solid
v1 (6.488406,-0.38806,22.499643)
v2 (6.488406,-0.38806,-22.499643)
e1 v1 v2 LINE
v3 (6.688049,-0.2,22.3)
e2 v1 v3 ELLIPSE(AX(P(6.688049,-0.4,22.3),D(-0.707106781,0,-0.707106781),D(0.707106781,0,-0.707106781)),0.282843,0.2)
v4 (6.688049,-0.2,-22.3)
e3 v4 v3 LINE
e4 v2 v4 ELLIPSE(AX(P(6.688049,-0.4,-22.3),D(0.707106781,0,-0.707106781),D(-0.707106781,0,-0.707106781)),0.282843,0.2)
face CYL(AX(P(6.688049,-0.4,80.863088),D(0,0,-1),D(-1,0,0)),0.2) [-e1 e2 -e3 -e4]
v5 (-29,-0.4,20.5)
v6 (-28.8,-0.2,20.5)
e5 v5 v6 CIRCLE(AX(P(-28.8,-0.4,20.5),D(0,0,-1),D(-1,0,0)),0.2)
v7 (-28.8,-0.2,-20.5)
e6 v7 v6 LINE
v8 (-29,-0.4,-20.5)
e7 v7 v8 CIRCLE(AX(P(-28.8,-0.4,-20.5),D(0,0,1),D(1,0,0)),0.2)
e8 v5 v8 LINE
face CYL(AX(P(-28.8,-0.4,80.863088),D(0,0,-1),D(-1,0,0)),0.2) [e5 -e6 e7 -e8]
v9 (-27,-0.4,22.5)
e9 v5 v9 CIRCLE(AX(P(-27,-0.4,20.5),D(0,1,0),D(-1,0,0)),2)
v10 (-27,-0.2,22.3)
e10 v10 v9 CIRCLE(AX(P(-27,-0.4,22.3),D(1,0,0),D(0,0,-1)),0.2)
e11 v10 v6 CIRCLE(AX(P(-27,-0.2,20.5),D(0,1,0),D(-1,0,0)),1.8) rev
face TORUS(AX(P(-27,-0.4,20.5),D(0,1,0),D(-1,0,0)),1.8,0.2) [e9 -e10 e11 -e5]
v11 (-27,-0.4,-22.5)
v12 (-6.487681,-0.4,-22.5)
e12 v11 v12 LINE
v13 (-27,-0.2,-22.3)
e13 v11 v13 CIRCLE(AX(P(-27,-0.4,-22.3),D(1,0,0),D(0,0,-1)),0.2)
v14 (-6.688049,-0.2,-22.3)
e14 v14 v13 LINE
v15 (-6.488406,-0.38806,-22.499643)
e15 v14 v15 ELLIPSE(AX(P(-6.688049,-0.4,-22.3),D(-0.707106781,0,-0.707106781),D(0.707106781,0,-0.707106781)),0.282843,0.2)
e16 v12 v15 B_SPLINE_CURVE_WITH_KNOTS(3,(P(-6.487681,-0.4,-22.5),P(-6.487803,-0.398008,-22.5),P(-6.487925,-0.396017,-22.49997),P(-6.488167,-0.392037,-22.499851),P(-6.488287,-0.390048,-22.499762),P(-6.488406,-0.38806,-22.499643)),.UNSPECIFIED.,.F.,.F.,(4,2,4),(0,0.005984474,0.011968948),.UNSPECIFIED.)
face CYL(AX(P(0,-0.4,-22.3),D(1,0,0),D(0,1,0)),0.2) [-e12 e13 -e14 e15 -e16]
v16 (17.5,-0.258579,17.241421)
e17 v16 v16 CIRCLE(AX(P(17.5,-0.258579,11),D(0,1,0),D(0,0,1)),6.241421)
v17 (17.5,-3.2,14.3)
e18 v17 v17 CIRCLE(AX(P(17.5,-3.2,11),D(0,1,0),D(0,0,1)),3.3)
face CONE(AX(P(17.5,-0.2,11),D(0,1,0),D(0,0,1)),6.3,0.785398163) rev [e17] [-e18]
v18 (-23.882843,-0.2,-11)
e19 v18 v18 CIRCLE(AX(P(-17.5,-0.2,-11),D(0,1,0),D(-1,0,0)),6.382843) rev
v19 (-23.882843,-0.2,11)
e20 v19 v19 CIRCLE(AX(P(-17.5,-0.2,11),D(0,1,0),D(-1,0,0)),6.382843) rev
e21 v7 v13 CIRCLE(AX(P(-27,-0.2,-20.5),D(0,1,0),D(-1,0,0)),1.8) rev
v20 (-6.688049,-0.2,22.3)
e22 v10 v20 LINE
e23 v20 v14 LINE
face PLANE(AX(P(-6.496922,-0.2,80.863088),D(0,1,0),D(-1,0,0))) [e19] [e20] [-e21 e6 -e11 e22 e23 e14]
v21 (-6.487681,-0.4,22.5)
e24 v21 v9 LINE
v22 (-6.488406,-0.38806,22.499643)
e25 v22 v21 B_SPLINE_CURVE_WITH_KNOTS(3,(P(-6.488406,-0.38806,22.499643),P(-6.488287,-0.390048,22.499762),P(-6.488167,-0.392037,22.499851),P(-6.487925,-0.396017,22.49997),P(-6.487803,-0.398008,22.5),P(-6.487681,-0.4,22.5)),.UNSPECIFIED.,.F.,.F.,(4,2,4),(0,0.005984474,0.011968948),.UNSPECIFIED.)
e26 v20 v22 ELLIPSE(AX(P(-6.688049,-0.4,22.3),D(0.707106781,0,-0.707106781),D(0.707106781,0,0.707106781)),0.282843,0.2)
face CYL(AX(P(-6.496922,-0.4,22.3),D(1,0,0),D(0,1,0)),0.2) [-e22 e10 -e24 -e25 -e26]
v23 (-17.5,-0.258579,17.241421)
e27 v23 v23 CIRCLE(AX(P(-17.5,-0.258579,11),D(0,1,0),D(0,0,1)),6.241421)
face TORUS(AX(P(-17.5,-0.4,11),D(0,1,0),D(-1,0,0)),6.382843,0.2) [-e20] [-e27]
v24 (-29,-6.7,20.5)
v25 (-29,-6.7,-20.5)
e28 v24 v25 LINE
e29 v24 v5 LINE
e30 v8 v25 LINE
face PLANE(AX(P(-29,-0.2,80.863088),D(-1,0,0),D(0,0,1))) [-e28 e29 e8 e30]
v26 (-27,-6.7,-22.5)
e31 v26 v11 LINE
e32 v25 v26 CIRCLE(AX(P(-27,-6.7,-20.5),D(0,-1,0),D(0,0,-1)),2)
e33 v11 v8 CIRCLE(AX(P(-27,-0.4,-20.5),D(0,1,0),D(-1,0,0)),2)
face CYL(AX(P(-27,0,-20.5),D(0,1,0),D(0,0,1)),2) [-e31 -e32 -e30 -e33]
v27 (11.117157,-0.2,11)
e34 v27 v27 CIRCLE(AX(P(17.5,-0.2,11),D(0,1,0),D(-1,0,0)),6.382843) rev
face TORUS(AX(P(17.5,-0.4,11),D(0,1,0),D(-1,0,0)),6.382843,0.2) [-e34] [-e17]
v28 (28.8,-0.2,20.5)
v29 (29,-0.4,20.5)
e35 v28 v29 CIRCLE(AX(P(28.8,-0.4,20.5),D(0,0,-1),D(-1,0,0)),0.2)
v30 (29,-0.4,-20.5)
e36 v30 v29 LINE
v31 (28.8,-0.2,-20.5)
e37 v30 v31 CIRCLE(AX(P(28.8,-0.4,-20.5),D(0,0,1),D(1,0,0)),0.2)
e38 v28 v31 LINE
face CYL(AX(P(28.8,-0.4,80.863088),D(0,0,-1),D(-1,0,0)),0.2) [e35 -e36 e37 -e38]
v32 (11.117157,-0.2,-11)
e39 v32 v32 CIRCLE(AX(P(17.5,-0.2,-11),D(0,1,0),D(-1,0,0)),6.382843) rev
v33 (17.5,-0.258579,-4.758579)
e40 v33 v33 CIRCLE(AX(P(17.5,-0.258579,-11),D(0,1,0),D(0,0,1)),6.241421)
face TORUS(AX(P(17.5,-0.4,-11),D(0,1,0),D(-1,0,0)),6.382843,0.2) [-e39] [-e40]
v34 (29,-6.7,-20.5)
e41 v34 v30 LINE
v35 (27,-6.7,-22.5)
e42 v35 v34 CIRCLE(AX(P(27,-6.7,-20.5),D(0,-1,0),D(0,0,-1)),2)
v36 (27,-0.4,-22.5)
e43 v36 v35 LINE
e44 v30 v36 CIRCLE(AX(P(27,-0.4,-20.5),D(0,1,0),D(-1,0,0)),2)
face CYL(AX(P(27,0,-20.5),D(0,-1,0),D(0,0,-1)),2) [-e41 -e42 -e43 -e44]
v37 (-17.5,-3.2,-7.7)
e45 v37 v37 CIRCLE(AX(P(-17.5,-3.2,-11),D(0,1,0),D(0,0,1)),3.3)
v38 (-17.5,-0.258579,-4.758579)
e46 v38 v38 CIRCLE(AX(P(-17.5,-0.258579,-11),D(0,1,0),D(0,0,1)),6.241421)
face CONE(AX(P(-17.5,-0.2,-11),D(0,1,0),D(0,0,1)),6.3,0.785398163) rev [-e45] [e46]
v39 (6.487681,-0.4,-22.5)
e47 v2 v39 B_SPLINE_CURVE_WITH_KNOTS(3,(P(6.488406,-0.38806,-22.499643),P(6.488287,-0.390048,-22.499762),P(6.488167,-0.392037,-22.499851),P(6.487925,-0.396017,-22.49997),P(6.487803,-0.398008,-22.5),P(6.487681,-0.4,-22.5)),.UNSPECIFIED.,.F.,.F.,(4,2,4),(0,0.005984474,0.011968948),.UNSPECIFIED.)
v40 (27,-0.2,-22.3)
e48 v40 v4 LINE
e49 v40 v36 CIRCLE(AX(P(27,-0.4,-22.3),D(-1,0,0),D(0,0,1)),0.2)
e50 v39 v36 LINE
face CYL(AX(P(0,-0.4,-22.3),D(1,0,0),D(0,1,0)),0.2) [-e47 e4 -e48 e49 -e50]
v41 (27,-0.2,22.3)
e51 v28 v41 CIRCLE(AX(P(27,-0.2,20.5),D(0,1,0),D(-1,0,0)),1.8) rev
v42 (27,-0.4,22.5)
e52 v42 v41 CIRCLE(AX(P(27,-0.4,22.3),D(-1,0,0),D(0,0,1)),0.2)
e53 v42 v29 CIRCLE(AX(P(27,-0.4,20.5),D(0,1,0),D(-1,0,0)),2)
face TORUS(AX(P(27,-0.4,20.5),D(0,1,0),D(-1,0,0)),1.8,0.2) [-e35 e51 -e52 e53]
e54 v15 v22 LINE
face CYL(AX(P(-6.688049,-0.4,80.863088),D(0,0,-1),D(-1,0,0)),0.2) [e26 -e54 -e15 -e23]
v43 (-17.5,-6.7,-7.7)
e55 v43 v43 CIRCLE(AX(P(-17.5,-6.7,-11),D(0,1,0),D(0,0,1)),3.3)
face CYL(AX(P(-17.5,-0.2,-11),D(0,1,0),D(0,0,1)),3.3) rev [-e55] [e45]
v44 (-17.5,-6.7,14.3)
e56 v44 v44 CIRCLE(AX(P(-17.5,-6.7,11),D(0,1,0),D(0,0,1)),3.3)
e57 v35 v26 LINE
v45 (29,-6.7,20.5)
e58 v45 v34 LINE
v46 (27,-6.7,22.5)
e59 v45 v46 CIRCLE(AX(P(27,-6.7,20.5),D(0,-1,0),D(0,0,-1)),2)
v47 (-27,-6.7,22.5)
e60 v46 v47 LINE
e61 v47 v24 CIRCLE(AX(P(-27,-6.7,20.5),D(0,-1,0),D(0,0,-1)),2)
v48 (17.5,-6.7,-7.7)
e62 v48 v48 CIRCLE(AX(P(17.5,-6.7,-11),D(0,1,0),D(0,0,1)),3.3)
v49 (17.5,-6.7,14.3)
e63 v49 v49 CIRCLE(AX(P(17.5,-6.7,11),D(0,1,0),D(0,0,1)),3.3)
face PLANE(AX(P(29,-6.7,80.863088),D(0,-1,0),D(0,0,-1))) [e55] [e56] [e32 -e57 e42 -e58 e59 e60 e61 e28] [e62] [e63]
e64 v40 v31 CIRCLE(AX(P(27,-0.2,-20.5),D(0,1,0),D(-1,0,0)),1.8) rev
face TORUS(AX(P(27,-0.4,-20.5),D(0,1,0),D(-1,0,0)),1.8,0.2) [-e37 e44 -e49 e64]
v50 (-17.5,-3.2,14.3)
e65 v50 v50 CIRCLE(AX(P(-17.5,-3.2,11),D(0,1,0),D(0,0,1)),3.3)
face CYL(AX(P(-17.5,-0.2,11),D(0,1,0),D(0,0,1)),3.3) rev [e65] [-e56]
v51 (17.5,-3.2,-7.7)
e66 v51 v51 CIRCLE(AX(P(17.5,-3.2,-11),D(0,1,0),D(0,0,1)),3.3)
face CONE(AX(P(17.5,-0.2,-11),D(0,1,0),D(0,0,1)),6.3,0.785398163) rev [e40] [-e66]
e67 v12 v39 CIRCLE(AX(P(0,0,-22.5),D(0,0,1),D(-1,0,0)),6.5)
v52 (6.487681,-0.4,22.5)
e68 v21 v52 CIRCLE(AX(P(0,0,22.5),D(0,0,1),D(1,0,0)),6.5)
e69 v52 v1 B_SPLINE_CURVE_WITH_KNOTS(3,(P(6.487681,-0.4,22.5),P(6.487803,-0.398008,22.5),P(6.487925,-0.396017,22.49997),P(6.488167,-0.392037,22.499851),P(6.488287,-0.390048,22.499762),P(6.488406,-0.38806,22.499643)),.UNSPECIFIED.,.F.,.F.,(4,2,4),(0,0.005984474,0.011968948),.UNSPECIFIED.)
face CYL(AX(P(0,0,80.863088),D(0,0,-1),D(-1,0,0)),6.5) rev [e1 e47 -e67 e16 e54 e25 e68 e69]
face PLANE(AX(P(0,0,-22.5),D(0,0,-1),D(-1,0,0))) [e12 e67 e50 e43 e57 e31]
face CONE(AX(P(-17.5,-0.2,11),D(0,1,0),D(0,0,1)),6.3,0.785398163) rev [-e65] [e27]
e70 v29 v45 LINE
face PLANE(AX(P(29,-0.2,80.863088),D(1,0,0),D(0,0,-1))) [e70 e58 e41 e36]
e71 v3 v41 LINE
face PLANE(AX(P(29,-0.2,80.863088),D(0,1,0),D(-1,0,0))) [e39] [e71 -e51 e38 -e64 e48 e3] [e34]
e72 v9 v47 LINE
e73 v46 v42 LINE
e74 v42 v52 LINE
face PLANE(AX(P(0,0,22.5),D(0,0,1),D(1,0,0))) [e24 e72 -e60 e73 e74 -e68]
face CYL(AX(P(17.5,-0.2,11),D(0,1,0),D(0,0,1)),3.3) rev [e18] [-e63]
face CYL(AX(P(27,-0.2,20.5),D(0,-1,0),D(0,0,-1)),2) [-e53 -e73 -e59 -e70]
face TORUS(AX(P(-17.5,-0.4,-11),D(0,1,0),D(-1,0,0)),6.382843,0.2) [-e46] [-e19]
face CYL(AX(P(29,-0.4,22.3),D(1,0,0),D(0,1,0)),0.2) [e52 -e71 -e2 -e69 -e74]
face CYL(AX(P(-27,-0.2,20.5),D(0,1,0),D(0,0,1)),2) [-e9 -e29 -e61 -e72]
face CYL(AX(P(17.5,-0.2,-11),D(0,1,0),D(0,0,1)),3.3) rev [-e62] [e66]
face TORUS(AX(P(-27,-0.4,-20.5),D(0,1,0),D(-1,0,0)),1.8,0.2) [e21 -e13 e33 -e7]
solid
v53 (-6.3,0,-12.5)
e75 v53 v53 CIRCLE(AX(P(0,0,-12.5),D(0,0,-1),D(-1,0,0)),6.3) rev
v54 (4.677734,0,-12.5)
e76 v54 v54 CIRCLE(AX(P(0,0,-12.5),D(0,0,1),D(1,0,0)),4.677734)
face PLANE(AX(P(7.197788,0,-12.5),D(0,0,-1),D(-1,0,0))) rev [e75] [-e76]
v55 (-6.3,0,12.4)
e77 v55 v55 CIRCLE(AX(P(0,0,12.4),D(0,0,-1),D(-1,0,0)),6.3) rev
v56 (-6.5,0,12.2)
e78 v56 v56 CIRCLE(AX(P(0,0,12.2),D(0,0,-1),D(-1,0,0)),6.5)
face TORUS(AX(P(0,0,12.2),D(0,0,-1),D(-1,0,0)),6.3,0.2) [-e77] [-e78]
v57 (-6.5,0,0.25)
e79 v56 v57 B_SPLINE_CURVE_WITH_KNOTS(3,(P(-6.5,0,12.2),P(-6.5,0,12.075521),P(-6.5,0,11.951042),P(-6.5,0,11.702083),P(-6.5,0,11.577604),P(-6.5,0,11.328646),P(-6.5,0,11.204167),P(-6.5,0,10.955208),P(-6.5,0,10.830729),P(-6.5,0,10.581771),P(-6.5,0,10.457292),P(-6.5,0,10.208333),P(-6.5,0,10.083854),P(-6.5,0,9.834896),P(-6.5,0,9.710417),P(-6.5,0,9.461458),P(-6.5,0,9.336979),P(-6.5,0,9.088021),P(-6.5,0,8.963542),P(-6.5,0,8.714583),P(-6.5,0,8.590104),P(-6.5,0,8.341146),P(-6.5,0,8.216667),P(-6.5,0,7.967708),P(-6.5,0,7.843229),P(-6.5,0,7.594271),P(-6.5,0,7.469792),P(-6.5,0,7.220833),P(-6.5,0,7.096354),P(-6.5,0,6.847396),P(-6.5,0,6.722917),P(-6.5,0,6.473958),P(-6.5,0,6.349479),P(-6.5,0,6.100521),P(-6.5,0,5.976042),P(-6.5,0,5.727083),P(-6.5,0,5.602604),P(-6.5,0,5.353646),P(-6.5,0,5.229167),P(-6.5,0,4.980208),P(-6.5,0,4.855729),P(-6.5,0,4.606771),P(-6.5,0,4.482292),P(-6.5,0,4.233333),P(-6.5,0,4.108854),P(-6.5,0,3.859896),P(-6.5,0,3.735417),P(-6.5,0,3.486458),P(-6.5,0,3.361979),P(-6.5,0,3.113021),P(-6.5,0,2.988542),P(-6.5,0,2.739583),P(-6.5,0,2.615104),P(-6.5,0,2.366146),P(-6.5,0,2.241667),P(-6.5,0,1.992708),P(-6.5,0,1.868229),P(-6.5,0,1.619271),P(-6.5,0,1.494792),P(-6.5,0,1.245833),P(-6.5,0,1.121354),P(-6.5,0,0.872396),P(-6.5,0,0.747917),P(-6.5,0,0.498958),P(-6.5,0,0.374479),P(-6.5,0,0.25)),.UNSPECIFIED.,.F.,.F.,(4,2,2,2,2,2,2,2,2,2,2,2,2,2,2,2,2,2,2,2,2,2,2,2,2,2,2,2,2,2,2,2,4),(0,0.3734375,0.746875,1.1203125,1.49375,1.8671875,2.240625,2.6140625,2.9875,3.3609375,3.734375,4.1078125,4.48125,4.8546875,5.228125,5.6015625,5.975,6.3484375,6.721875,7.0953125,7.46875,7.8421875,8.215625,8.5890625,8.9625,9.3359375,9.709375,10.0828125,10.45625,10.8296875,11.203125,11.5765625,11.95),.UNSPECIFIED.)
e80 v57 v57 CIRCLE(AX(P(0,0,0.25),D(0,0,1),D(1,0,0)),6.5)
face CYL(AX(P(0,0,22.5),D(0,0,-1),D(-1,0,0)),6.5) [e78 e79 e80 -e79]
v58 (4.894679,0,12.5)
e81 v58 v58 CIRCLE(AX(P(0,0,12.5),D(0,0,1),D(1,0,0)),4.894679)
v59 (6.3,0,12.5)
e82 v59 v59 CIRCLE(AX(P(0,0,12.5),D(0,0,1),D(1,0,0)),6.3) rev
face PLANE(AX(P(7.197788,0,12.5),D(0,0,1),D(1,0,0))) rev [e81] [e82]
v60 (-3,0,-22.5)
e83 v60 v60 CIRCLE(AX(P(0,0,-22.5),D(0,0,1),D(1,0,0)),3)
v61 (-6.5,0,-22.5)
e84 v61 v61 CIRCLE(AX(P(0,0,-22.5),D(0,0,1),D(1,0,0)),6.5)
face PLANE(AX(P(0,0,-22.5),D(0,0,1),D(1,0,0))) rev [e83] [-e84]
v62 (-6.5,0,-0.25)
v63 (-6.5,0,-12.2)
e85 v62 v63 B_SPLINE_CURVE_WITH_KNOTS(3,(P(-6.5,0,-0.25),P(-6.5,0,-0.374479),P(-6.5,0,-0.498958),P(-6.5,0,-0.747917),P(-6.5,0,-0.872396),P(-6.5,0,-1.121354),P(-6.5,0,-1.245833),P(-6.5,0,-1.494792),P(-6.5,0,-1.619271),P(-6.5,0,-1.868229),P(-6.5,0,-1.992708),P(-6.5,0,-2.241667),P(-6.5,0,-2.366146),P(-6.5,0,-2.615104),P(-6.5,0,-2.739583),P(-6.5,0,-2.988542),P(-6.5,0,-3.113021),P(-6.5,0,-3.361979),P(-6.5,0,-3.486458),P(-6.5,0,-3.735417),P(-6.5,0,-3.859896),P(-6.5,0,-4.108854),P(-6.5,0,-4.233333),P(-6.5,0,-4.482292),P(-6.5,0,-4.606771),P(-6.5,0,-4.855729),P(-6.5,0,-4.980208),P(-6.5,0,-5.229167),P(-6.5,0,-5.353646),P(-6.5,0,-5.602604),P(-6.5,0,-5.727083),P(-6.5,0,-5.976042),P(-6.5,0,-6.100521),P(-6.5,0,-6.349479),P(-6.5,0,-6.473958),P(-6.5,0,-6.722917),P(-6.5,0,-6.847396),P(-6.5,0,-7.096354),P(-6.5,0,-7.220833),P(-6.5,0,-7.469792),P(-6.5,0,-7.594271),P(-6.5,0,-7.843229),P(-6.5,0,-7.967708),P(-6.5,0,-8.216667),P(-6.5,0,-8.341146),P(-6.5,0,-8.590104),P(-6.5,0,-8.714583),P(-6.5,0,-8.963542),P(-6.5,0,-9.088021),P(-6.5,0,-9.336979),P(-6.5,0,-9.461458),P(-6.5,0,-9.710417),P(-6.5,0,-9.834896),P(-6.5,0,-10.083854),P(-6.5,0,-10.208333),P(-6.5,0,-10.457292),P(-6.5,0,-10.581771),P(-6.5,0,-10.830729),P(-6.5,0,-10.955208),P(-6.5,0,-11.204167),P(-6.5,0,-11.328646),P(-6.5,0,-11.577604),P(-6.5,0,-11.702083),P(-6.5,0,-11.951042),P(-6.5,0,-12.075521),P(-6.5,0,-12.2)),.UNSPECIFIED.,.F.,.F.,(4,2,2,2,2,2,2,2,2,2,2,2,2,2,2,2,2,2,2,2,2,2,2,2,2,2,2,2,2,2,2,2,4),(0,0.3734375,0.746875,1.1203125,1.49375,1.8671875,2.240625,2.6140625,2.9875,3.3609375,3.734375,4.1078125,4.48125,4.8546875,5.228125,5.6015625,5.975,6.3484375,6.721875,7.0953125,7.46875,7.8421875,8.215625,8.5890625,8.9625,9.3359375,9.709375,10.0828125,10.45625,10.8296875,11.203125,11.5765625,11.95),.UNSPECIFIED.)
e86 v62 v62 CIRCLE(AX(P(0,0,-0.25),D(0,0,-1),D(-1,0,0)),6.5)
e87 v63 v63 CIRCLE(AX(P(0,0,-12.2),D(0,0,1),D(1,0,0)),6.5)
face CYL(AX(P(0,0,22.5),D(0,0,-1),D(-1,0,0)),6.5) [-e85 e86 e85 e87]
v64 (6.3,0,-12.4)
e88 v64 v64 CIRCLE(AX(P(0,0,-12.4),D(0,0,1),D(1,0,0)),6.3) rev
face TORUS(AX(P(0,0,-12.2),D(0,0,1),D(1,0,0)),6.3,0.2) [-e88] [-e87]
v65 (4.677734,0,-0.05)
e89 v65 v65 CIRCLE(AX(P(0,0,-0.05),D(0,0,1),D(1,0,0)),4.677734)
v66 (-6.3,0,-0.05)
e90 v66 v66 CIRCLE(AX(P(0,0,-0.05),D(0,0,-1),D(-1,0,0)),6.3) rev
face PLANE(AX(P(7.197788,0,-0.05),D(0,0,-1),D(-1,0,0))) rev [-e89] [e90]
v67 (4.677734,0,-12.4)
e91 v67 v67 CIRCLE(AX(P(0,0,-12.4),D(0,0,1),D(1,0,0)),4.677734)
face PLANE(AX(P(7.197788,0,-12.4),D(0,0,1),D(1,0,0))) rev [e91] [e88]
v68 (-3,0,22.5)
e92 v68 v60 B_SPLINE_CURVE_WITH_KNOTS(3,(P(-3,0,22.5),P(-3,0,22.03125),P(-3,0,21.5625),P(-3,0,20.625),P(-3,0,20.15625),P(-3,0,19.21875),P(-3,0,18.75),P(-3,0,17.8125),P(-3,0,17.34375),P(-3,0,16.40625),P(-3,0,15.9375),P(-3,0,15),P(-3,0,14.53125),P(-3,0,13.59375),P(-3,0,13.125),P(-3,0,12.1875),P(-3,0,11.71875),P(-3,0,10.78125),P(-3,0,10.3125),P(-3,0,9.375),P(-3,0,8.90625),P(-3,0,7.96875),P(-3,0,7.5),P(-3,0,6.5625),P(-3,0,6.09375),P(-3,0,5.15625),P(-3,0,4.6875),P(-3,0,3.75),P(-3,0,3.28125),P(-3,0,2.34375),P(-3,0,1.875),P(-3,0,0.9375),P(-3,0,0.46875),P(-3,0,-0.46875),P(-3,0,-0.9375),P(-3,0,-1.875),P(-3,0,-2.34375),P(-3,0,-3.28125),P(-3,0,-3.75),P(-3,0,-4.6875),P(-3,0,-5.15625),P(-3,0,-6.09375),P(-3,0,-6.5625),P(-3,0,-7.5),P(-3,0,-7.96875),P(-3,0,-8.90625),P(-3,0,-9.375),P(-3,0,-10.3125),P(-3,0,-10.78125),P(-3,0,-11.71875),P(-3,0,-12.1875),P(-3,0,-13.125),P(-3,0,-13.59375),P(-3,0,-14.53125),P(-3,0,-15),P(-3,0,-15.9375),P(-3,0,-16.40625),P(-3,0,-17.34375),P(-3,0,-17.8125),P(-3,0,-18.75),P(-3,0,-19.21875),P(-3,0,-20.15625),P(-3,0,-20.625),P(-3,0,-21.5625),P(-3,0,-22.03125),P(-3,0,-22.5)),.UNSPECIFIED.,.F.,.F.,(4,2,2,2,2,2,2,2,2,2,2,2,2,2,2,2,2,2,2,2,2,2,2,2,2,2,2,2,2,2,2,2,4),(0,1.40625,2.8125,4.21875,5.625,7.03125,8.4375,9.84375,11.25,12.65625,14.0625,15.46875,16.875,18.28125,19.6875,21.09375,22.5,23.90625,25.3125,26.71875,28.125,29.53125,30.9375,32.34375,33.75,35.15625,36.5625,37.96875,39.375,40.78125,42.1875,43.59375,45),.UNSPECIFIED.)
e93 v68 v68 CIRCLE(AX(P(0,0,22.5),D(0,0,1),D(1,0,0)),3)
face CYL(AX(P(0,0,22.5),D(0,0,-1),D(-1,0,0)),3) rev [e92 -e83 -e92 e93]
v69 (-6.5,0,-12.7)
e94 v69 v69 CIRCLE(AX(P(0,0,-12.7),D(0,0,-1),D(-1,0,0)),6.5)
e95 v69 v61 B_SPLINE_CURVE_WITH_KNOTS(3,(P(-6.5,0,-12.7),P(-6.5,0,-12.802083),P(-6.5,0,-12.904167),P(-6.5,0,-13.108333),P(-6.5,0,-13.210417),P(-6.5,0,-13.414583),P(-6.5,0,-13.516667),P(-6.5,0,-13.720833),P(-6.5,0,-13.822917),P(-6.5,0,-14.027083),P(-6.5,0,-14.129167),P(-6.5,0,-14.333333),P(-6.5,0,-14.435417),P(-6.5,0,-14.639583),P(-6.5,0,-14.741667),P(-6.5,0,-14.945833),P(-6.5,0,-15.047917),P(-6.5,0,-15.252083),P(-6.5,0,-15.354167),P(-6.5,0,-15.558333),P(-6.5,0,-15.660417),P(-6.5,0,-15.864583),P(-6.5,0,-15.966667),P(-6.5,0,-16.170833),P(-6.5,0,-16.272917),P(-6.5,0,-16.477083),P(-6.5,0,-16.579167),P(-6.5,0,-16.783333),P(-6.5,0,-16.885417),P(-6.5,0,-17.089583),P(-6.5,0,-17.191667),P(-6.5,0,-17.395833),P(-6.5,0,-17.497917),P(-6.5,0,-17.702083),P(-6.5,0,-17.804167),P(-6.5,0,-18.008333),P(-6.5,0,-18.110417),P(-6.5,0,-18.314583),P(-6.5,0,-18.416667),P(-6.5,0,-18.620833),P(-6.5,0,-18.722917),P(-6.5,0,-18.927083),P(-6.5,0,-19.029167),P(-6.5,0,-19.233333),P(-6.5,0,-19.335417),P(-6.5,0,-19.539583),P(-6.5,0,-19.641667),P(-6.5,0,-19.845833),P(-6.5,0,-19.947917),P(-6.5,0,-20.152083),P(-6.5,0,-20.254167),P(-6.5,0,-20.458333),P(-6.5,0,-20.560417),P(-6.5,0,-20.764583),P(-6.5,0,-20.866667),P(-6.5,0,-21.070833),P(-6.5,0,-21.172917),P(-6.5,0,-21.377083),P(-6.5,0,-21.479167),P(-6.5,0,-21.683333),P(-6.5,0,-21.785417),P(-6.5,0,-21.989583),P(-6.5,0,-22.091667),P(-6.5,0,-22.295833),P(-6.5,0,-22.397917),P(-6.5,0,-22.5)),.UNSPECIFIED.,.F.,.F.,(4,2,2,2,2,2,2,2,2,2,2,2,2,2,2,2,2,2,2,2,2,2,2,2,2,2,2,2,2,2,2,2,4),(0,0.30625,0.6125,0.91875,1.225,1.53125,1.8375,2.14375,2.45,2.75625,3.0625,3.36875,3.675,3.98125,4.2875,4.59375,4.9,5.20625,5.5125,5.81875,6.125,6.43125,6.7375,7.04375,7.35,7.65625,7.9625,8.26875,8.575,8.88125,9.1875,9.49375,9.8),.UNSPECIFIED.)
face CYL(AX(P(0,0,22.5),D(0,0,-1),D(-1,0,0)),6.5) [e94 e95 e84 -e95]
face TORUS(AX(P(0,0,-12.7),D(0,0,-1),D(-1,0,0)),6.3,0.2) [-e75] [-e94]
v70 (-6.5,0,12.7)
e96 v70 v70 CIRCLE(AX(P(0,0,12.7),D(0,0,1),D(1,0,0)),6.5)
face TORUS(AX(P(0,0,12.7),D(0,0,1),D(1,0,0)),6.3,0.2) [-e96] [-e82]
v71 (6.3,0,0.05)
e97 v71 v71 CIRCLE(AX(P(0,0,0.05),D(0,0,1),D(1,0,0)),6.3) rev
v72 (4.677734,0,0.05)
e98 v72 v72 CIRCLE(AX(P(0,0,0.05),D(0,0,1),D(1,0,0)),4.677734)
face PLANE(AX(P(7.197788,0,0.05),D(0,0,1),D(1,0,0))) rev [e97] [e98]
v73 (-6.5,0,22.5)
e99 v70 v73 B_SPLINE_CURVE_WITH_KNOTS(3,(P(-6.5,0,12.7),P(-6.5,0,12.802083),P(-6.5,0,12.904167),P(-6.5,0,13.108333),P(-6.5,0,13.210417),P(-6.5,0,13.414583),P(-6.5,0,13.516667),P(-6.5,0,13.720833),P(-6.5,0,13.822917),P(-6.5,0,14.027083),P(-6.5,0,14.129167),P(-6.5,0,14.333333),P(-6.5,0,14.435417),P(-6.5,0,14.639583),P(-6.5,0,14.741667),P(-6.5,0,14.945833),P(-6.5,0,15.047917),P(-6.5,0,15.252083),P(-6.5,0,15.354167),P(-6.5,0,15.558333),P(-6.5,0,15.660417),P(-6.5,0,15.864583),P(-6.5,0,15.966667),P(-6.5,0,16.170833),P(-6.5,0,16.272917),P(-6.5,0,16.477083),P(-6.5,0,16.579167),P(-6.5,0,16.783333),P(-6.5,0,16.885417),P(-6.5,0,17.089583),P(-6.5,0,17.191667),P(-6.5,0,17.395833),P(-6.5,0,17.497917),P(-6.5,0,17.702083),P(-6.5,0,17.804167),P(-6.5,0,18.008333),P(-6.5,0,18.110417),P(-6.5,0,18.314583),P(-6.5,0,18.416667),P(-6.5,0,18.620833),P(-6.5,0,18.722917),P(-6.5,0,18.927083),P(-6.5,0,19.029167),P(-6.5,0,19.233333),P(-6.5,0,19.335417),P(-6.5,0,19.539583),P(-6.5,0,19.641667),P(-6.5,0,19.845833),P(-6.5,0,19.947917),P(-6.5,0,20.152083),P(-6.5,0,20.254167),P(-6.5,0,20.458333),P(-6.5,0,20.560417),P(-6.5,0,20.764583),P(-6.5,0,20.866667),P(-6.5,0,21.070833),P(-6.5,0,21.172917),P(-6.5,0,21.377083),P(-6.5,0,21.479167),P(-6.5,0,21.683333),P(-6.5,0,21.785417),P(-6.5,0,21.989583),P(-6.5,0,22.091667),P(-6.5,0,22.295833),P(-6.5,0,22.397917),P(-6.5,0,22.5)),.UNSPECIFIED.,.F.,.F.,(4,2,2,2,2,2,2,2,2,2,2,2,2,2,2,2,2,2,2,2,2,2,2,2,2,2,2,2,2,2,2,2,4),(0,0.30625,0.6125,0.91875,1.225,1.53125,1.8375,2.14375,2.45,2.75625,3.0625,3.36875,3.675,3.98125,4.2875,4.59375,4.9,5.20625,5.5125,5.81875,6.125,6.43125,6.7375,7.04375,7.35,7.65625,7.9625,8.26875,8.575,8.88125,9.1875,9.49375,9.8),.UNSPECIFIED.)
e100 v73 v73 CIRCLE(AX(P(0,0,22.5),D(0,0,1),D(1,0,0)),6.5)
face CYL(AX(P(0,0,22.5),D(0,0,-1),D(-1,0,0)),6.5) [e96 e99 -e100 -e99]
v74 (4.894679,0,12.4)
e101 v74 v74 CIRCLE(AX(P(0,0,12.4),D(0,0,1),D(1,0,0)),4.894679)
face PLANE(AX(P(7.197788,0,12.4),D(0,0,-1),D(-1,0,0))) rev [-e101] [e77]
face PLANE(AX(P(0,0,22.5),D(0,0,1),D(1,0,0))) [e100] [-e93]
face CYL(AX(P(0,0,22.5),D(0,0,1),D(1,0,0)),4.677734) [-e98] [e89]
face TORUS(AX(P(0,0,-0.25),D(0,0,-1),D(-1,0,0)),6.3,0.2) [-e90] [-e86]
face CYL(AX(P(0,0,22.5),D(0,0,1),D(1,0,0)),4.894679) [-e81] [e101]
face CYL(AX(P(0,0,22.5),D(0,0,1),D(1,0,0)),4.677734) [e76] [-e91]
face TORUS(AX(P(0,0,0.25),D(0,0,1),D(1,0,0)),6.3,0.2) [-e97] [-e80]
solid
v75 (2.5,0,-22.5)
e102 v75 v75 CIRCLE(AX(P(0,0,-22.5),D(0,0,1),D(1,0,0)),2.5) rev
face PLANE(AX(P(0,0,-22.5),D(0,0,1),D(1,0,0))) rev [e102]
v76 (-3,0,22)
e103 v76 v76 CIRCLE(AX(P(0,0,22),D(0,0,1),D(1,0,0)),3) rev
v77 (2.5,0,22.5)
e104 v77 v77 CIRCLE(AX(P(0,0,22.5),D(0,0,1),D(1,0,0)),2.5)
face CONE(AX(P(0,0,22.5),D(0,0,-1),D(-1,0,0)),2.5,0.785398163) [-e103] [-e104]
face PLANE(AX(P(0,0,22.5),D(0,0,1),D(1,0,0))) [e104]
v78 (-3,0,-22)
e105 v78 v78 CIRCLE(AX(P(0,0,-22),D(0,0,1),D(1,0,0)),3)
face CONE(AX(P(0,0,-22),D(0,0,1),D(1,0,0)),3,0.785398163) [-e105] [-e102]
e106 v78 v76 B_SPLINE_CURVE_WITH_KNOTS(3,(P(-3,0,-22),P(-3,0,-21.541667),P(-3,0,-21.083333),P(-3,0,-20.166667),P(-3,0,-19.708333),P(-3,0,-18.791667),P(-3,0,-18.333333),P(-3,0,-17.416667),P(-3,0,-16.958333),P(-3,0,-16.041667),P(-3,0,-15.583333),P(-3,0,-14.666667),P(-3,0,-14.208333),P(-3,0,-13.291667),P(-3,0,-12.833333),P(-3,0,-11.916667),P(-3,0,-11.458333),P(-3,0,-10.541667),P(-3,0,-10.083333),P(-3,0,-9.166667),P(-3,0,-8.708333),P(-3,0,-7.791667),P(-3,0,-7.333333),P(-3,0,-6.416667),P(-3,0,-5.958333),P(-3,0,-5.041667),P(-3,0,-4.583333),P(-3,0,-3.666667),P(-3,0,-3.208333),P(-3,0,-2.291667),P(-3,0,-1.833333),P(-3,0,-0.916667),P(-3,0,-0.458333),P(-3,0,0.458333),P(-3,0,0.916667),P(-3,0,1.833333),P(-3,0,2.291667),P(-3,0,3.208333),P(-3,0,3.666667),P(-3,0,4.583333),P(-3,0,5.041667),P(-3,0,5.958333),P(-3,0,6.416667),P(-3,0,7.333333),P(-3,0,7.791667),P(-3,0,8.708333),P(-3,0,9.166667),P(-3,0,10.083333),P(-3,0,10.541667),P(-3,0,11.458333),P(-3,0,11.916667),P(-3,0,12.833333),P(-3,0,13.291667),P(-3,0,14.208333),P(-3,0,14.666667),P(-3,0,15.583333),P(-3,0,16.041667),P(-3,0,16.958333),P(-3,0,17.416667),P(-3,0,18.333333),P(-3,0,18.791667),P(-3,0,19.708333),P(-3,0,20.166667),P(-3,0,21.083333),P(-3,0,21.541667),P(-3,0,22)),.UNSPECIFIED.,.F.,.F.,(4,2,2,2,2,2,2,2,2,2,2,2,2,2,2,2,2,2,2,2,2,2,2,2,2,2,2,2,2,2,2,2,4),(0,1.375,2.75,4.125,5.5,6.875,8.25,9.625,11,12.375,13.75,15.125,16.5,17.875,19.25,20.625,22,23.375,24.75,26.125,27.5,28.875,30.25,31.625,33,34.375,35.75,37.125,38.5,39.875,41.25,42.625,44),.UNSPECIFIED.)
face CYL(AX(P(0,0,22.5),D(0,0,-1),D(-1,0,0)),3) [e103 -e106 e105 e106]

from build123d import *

# Parameters (mm, degrees)
SKETCH_1_R                  = 6.5
SKETCH_1_R_2                = 3
EXTRUDE_1_DEPTH             = 22.5
SKETCH_2_R                  = 3
EXTRUDE_2_DEPTH             = 22.5
CHAMFER_1_SIZE              = 0.5
SKETCH_3_W                  = 2.520053464
SKETCH_3_H                  = 0.1
SKETCH_3_W_2                = 2.303108133
FILLET_1_R                  = 0.2
EXTRUDE_6_DEPTH             = 45
HOLE_WIZARD_M6_1_AT_2_COUNT = 2
HOLE_WIZARD_M6_1_AT_2_PITCH = 35
HOLE_WIZARD_M6_1_AT_3_COUNT = 2
HOLE_WIZARD_M6_1_AT_3_PITCH = 22
HOLE_WIZARD_M6_1_AT_4_COUNT = 2
HOLE_WIZARD_M6_1_AT_4_PITCH = 41.340053217
FILLET_2_R                  = 0.2
FILLET_3_R                  = 2
CHAMFER_2_SIZE              = 0.5


with BuildPart() as part:
    # 草图1 → 凸台-拉伸1 (new, symmetric)
    with BuildSketch(Plane.XY):
        with Locations(Location((0, 0, 0), (0, 0, 180))):
            Circle(SKETCH_1_R)
        with Locations(Location((0, 0, 0), (0, 0, 180))):
            Circle(SKETCH_1_R_2, mode=Mode.SUBTRACT)
    extrude(amount=EXTRUDE_1_DEPTH, both=True)

    # 草图3 → 切除-旋转1 (revolve, cut)
    with BuildSketch(Plane(origin=(0, 0, 0), x_dir=(1, 0, 0), z_dir=(0, 1, 0)), mode=Mode.PRIVATE) as cut_revolve_1_sk:
        with Locations((5.937760795, 12.45)):
            Rectangle(SKETCH_3_W, SKETCH_3_H)
        with Locations((5.937760795, 0)):
            Rectangle(SKETCH_3_W, SKETCH_3_H)
        with Locations((6.04623346, -12.45)):
            Rectangle(SKETCH_3_W_2, SKETCH_3_H)
    revolve(cut_revolve_1_sk.sketch.rotate(Axis((0, 0, 22.5), (0, 0, -1)), 180), axis=Axis((0, 0, 22.5), (0, 0, -1)), mode=Mode.SUBTRACT)

    # 圆角1
    fillet_1_edges = [part.edges().sort_by_distance(p)[0] for p in [
        (6.5, 0, -12.4),
        (6.5, 0, -12.5),
        (6.5, 0, 0.05),
        (6.5, 0, -0.05),
        (6.5, 0, 12.5),
        (6.5, 0, 12.4),
    ]]
    fillet(fillet_1_edges, radius=FILLET_1_R)


with BuildPart() as body_2:
    # 草图2 → 凸台-拉伸2 (new, symmetric)
    with BuildSketch(Plane.XY):
        with Locations(Location((0, 0, 0), (0, 0, 180))):
            Circle(SKETCH_2_R)
    extrude(amount=EXTRUDE_2_DEPTH, both=True)

    # 倒角1
    chamfer_1_edges = [body_2.edges().sort_by_distance(p)[0] for p in [
        (3, 0, 22.5),
    ]]
    chamfer(chamfer_1_edges, length=CHAMFER_1_SIZE)

    # 倒角2
    chamfer_2_edges = [body_2.edges().sort_by_distance(p)[0] for p in [
        (3, 0, -22.5),
    ]]
    chamfer(chamfer_2_edges, length=CHAMFER_2_SIZE)


with BuildPart() as body_3:
    # 草图5 → 凸台-拉伸6 (new body)
    with BuildSketch(Plane(origin=(0, 0, -22.5), x_dir=(-1, 0, 0), z_dir=(0, 0, -1))):
        with BuildLine():
            Line((6.496922348, -0.2), (29, -0.2))
            Line((29, -0.2), (29, -6.7))
            Line((29, -6.7), (-29, -6.7))
            Line((-29, -6.7), (-29, -0.2))
            Line((-29, -0.2), (-6.496922348, -0.2))
            ThreePointArc((-6.496922348, -0.2), (0, -6.5), (6.496922348, -0.2))
        make_face()
    extrude(amount=-EXTRUDE_6_DEPTH)

    # 草图6 → M6 平头机械螺钉的锥形沉头孔1 (revolve, cut)
    with BuildSketch(Plane(origin=(-17.5, -0.2, -11), x_dir=(0, 0, 1), z_dir=(1, 0, 0))):
        Polygon((0, 0), (0, 6.5), (3.3, 6.5), (3.3, 3), (6.3, 0), align=None)
    hole_wizard_m6_1 = revolve(axis=Axis((-17.5, 6.15, -11), (0, -1, 0)), mode=Mode.SUBTRACT)

    # M6 平头机械螺钉的锥形沉头孔1 at 2: M6 平头机械螺钉的锥形沉头孔1 ×2
    with Locations(*[(i * HOLE_WIZARD_M6_1_AT_2_PITCH, 0, 0) for i in range(1, HOLE_WIZARD_M6_1_AT_2_COUNT)]):
        add(hole_wizard_m6_1, mode=Mode.SUBTRACT)

    # M6 平头机械螺钉的锥形沉头孔1 at 3: M6 平头机械螺钉的锥形沉头孔1 ×2
    with Locations(*[(0, 0, i * HOLE_WIZARD_M6_1_AT_3_PITCH) for i in range(1, HOLE_WIZARD_M6_1_AT_3_COUNT)]):
        add(hole_wizard_m6_1, mode=Mode.SUBTRACT)

    # M6 平头机械螺钉的锥形沉头孔1 at 4: M6 平头机械螺钉的锥形沉头孔1 ×2
    with Locations(*[Vector(0.8466365492110047, 0, 0.5321715452183459) * (i * HOLE_WIZARD_M6_1_AT_4_PITCH) for i in range(1, HOLE_WIZARD_M6_1_AT_4_COUNT)]):
        add(hole_wizard_m6_1, mode=Mode.SUBTRACT)

    # 圆角2
    fillet_2_edges = [body_3.edges().sort_by_distance(p)[0] for p in [
        (-17.748461174, -0.2, -22.5),
        (17.5, -0.2, 4.7),
        (17.748461174, -0.2, -22.5),
        (-17.5, -0.2, 4.7),
        (-29, -0.2, 0),
        (-17.748461174, -0.2, 22.5),
        (17.5, -0.2, -17.3),
        (-6.496922348, -0.2, 0),
        (6.496922348, -0.2, 0),
        (17.748461174, -0.2, 22.5),
        (29, -0.2, 0),
        (-17.5, -0.2, -17.3),
    ]]
    fillet(fillet_2_edges, radius=FILLET_2_R)

    # 圆角3
    # the kernel refuses this fillet: 2 mm, written as the material it takes off along each edge
    with BuildSketch(Plane(origin=(27, -0.2, 20.5), x_dir=(0, 0, 1), z_dir=(-1, 0, 0))) as fillet_3_piece_1:
        with BuildLine():
            CenterArc((1.8, -0.2), 0.2, 0, 90)
            Line((2, -0.2), (2, 0))
            Line((2, 0), (1.8, 0))
        make_face()
    revolve(axis=Axis((27, -0.2, 20.5), (0, 1, 0)), revolution_arc=90, mode=Mode.SUBTRACT)
    with BuildSketch(Plane(origin=(27, -0.2, -20.5), x_dir=(1, 0, 0), z_dir=(0, 0, 1))) as fillet_3_piece_2:
        with BuildLine():
            CenterArc((1.8, -0.2), 0.2, 0, 90)
            Line((2, -0.2), (2, 0))
            Line((2, 0), (1.8, 0))
        make_face()
    revolve(axis=Axis((27, -0.2, -20.5), (0, 1, 0)), revolution_arc=90, mode=Mode.SUBTRACT)
    with BuildSketch(Plane(origin=(-27, -0.2, 20.5), x_dir=(-1, 0, 0), z_dir=(0, 0, -1))) as fillet_3_piece_3:
        with BuildLine():
            CenterArc((1.8, -0.2), 0.2, 0, 90)
            Line((2, -0.2), (2, 0))
            Line((2, 0), (1.8, 0))
        make_face()
    revolve(axis=Axis((-27, -0.2, 20.5), (0, 1, 0)), revolution_arc=90, mode=Mode.SUBTRACT)
    with BuildSketch(Plane(origin=(-27, -0.2, -20.5), x_dir=(0, 0, -1), z_dir=(1, 0, 0))) as fillet_3_piece_4:
        with BuildLine():
            CenterArc((1.8, -0.2), 0.2, 0, 90)
            Line((2, -0.2), (2, 0))
            Line((2, 0), (1.8, 0))
        make_face()
    revolve(axis=Axis((-27, -0.2, -20.5), (0, 1, 0)), revolution_arc=90, mode=Mode.SUBTRACT)
    with BuildSketch(Plane(origin=(-29, -0.2, -22.5), x_dir=(1, 0, 0), z_dir=(0, -1, 0)), Plane(origin=(-29, -0.2, 22.5), x_dir=(0, 0, -1), z_dir=(0, -1, 0)), Plane(origin=(29, -11.7, -22.5), x_dir=(-1, 0, 0), z_dir=(0, 1, 0))) as fillet_3_piece_5:
        with BuildLine():
            CenterArc((FILLET_3_R, FILLET_3_R), FILLET_3_R, 180, 90)
            Line((0, FILLET_3_R), (0, 0))
            Line((0, 0), (FILLET_3_R, 0))
        make_face()
    extrude(amount=11.5, mode=Mode.SUBTRACT)
    with BuildSketch(Plane(origin=(29, -11.7, 22.5), x_dir=(-1, 0, 0), z_dir=(0, 1, 0))) as fillet_3_piece_6:
        with BuildLine():
            CenterArc((FILLET_3_R, -FILLET_3_R), FILLET_3_R, 90, 90)
            Line((0, -FILLET_3_R), (0, 0))
            Line((0, 0), (FILLET_3_R, 0))
        make_face()
    extrude(amount=11.5, mode=Mode.SUBTRACT)


solid = Compound([part.part, body_2.part, body_3.part])
